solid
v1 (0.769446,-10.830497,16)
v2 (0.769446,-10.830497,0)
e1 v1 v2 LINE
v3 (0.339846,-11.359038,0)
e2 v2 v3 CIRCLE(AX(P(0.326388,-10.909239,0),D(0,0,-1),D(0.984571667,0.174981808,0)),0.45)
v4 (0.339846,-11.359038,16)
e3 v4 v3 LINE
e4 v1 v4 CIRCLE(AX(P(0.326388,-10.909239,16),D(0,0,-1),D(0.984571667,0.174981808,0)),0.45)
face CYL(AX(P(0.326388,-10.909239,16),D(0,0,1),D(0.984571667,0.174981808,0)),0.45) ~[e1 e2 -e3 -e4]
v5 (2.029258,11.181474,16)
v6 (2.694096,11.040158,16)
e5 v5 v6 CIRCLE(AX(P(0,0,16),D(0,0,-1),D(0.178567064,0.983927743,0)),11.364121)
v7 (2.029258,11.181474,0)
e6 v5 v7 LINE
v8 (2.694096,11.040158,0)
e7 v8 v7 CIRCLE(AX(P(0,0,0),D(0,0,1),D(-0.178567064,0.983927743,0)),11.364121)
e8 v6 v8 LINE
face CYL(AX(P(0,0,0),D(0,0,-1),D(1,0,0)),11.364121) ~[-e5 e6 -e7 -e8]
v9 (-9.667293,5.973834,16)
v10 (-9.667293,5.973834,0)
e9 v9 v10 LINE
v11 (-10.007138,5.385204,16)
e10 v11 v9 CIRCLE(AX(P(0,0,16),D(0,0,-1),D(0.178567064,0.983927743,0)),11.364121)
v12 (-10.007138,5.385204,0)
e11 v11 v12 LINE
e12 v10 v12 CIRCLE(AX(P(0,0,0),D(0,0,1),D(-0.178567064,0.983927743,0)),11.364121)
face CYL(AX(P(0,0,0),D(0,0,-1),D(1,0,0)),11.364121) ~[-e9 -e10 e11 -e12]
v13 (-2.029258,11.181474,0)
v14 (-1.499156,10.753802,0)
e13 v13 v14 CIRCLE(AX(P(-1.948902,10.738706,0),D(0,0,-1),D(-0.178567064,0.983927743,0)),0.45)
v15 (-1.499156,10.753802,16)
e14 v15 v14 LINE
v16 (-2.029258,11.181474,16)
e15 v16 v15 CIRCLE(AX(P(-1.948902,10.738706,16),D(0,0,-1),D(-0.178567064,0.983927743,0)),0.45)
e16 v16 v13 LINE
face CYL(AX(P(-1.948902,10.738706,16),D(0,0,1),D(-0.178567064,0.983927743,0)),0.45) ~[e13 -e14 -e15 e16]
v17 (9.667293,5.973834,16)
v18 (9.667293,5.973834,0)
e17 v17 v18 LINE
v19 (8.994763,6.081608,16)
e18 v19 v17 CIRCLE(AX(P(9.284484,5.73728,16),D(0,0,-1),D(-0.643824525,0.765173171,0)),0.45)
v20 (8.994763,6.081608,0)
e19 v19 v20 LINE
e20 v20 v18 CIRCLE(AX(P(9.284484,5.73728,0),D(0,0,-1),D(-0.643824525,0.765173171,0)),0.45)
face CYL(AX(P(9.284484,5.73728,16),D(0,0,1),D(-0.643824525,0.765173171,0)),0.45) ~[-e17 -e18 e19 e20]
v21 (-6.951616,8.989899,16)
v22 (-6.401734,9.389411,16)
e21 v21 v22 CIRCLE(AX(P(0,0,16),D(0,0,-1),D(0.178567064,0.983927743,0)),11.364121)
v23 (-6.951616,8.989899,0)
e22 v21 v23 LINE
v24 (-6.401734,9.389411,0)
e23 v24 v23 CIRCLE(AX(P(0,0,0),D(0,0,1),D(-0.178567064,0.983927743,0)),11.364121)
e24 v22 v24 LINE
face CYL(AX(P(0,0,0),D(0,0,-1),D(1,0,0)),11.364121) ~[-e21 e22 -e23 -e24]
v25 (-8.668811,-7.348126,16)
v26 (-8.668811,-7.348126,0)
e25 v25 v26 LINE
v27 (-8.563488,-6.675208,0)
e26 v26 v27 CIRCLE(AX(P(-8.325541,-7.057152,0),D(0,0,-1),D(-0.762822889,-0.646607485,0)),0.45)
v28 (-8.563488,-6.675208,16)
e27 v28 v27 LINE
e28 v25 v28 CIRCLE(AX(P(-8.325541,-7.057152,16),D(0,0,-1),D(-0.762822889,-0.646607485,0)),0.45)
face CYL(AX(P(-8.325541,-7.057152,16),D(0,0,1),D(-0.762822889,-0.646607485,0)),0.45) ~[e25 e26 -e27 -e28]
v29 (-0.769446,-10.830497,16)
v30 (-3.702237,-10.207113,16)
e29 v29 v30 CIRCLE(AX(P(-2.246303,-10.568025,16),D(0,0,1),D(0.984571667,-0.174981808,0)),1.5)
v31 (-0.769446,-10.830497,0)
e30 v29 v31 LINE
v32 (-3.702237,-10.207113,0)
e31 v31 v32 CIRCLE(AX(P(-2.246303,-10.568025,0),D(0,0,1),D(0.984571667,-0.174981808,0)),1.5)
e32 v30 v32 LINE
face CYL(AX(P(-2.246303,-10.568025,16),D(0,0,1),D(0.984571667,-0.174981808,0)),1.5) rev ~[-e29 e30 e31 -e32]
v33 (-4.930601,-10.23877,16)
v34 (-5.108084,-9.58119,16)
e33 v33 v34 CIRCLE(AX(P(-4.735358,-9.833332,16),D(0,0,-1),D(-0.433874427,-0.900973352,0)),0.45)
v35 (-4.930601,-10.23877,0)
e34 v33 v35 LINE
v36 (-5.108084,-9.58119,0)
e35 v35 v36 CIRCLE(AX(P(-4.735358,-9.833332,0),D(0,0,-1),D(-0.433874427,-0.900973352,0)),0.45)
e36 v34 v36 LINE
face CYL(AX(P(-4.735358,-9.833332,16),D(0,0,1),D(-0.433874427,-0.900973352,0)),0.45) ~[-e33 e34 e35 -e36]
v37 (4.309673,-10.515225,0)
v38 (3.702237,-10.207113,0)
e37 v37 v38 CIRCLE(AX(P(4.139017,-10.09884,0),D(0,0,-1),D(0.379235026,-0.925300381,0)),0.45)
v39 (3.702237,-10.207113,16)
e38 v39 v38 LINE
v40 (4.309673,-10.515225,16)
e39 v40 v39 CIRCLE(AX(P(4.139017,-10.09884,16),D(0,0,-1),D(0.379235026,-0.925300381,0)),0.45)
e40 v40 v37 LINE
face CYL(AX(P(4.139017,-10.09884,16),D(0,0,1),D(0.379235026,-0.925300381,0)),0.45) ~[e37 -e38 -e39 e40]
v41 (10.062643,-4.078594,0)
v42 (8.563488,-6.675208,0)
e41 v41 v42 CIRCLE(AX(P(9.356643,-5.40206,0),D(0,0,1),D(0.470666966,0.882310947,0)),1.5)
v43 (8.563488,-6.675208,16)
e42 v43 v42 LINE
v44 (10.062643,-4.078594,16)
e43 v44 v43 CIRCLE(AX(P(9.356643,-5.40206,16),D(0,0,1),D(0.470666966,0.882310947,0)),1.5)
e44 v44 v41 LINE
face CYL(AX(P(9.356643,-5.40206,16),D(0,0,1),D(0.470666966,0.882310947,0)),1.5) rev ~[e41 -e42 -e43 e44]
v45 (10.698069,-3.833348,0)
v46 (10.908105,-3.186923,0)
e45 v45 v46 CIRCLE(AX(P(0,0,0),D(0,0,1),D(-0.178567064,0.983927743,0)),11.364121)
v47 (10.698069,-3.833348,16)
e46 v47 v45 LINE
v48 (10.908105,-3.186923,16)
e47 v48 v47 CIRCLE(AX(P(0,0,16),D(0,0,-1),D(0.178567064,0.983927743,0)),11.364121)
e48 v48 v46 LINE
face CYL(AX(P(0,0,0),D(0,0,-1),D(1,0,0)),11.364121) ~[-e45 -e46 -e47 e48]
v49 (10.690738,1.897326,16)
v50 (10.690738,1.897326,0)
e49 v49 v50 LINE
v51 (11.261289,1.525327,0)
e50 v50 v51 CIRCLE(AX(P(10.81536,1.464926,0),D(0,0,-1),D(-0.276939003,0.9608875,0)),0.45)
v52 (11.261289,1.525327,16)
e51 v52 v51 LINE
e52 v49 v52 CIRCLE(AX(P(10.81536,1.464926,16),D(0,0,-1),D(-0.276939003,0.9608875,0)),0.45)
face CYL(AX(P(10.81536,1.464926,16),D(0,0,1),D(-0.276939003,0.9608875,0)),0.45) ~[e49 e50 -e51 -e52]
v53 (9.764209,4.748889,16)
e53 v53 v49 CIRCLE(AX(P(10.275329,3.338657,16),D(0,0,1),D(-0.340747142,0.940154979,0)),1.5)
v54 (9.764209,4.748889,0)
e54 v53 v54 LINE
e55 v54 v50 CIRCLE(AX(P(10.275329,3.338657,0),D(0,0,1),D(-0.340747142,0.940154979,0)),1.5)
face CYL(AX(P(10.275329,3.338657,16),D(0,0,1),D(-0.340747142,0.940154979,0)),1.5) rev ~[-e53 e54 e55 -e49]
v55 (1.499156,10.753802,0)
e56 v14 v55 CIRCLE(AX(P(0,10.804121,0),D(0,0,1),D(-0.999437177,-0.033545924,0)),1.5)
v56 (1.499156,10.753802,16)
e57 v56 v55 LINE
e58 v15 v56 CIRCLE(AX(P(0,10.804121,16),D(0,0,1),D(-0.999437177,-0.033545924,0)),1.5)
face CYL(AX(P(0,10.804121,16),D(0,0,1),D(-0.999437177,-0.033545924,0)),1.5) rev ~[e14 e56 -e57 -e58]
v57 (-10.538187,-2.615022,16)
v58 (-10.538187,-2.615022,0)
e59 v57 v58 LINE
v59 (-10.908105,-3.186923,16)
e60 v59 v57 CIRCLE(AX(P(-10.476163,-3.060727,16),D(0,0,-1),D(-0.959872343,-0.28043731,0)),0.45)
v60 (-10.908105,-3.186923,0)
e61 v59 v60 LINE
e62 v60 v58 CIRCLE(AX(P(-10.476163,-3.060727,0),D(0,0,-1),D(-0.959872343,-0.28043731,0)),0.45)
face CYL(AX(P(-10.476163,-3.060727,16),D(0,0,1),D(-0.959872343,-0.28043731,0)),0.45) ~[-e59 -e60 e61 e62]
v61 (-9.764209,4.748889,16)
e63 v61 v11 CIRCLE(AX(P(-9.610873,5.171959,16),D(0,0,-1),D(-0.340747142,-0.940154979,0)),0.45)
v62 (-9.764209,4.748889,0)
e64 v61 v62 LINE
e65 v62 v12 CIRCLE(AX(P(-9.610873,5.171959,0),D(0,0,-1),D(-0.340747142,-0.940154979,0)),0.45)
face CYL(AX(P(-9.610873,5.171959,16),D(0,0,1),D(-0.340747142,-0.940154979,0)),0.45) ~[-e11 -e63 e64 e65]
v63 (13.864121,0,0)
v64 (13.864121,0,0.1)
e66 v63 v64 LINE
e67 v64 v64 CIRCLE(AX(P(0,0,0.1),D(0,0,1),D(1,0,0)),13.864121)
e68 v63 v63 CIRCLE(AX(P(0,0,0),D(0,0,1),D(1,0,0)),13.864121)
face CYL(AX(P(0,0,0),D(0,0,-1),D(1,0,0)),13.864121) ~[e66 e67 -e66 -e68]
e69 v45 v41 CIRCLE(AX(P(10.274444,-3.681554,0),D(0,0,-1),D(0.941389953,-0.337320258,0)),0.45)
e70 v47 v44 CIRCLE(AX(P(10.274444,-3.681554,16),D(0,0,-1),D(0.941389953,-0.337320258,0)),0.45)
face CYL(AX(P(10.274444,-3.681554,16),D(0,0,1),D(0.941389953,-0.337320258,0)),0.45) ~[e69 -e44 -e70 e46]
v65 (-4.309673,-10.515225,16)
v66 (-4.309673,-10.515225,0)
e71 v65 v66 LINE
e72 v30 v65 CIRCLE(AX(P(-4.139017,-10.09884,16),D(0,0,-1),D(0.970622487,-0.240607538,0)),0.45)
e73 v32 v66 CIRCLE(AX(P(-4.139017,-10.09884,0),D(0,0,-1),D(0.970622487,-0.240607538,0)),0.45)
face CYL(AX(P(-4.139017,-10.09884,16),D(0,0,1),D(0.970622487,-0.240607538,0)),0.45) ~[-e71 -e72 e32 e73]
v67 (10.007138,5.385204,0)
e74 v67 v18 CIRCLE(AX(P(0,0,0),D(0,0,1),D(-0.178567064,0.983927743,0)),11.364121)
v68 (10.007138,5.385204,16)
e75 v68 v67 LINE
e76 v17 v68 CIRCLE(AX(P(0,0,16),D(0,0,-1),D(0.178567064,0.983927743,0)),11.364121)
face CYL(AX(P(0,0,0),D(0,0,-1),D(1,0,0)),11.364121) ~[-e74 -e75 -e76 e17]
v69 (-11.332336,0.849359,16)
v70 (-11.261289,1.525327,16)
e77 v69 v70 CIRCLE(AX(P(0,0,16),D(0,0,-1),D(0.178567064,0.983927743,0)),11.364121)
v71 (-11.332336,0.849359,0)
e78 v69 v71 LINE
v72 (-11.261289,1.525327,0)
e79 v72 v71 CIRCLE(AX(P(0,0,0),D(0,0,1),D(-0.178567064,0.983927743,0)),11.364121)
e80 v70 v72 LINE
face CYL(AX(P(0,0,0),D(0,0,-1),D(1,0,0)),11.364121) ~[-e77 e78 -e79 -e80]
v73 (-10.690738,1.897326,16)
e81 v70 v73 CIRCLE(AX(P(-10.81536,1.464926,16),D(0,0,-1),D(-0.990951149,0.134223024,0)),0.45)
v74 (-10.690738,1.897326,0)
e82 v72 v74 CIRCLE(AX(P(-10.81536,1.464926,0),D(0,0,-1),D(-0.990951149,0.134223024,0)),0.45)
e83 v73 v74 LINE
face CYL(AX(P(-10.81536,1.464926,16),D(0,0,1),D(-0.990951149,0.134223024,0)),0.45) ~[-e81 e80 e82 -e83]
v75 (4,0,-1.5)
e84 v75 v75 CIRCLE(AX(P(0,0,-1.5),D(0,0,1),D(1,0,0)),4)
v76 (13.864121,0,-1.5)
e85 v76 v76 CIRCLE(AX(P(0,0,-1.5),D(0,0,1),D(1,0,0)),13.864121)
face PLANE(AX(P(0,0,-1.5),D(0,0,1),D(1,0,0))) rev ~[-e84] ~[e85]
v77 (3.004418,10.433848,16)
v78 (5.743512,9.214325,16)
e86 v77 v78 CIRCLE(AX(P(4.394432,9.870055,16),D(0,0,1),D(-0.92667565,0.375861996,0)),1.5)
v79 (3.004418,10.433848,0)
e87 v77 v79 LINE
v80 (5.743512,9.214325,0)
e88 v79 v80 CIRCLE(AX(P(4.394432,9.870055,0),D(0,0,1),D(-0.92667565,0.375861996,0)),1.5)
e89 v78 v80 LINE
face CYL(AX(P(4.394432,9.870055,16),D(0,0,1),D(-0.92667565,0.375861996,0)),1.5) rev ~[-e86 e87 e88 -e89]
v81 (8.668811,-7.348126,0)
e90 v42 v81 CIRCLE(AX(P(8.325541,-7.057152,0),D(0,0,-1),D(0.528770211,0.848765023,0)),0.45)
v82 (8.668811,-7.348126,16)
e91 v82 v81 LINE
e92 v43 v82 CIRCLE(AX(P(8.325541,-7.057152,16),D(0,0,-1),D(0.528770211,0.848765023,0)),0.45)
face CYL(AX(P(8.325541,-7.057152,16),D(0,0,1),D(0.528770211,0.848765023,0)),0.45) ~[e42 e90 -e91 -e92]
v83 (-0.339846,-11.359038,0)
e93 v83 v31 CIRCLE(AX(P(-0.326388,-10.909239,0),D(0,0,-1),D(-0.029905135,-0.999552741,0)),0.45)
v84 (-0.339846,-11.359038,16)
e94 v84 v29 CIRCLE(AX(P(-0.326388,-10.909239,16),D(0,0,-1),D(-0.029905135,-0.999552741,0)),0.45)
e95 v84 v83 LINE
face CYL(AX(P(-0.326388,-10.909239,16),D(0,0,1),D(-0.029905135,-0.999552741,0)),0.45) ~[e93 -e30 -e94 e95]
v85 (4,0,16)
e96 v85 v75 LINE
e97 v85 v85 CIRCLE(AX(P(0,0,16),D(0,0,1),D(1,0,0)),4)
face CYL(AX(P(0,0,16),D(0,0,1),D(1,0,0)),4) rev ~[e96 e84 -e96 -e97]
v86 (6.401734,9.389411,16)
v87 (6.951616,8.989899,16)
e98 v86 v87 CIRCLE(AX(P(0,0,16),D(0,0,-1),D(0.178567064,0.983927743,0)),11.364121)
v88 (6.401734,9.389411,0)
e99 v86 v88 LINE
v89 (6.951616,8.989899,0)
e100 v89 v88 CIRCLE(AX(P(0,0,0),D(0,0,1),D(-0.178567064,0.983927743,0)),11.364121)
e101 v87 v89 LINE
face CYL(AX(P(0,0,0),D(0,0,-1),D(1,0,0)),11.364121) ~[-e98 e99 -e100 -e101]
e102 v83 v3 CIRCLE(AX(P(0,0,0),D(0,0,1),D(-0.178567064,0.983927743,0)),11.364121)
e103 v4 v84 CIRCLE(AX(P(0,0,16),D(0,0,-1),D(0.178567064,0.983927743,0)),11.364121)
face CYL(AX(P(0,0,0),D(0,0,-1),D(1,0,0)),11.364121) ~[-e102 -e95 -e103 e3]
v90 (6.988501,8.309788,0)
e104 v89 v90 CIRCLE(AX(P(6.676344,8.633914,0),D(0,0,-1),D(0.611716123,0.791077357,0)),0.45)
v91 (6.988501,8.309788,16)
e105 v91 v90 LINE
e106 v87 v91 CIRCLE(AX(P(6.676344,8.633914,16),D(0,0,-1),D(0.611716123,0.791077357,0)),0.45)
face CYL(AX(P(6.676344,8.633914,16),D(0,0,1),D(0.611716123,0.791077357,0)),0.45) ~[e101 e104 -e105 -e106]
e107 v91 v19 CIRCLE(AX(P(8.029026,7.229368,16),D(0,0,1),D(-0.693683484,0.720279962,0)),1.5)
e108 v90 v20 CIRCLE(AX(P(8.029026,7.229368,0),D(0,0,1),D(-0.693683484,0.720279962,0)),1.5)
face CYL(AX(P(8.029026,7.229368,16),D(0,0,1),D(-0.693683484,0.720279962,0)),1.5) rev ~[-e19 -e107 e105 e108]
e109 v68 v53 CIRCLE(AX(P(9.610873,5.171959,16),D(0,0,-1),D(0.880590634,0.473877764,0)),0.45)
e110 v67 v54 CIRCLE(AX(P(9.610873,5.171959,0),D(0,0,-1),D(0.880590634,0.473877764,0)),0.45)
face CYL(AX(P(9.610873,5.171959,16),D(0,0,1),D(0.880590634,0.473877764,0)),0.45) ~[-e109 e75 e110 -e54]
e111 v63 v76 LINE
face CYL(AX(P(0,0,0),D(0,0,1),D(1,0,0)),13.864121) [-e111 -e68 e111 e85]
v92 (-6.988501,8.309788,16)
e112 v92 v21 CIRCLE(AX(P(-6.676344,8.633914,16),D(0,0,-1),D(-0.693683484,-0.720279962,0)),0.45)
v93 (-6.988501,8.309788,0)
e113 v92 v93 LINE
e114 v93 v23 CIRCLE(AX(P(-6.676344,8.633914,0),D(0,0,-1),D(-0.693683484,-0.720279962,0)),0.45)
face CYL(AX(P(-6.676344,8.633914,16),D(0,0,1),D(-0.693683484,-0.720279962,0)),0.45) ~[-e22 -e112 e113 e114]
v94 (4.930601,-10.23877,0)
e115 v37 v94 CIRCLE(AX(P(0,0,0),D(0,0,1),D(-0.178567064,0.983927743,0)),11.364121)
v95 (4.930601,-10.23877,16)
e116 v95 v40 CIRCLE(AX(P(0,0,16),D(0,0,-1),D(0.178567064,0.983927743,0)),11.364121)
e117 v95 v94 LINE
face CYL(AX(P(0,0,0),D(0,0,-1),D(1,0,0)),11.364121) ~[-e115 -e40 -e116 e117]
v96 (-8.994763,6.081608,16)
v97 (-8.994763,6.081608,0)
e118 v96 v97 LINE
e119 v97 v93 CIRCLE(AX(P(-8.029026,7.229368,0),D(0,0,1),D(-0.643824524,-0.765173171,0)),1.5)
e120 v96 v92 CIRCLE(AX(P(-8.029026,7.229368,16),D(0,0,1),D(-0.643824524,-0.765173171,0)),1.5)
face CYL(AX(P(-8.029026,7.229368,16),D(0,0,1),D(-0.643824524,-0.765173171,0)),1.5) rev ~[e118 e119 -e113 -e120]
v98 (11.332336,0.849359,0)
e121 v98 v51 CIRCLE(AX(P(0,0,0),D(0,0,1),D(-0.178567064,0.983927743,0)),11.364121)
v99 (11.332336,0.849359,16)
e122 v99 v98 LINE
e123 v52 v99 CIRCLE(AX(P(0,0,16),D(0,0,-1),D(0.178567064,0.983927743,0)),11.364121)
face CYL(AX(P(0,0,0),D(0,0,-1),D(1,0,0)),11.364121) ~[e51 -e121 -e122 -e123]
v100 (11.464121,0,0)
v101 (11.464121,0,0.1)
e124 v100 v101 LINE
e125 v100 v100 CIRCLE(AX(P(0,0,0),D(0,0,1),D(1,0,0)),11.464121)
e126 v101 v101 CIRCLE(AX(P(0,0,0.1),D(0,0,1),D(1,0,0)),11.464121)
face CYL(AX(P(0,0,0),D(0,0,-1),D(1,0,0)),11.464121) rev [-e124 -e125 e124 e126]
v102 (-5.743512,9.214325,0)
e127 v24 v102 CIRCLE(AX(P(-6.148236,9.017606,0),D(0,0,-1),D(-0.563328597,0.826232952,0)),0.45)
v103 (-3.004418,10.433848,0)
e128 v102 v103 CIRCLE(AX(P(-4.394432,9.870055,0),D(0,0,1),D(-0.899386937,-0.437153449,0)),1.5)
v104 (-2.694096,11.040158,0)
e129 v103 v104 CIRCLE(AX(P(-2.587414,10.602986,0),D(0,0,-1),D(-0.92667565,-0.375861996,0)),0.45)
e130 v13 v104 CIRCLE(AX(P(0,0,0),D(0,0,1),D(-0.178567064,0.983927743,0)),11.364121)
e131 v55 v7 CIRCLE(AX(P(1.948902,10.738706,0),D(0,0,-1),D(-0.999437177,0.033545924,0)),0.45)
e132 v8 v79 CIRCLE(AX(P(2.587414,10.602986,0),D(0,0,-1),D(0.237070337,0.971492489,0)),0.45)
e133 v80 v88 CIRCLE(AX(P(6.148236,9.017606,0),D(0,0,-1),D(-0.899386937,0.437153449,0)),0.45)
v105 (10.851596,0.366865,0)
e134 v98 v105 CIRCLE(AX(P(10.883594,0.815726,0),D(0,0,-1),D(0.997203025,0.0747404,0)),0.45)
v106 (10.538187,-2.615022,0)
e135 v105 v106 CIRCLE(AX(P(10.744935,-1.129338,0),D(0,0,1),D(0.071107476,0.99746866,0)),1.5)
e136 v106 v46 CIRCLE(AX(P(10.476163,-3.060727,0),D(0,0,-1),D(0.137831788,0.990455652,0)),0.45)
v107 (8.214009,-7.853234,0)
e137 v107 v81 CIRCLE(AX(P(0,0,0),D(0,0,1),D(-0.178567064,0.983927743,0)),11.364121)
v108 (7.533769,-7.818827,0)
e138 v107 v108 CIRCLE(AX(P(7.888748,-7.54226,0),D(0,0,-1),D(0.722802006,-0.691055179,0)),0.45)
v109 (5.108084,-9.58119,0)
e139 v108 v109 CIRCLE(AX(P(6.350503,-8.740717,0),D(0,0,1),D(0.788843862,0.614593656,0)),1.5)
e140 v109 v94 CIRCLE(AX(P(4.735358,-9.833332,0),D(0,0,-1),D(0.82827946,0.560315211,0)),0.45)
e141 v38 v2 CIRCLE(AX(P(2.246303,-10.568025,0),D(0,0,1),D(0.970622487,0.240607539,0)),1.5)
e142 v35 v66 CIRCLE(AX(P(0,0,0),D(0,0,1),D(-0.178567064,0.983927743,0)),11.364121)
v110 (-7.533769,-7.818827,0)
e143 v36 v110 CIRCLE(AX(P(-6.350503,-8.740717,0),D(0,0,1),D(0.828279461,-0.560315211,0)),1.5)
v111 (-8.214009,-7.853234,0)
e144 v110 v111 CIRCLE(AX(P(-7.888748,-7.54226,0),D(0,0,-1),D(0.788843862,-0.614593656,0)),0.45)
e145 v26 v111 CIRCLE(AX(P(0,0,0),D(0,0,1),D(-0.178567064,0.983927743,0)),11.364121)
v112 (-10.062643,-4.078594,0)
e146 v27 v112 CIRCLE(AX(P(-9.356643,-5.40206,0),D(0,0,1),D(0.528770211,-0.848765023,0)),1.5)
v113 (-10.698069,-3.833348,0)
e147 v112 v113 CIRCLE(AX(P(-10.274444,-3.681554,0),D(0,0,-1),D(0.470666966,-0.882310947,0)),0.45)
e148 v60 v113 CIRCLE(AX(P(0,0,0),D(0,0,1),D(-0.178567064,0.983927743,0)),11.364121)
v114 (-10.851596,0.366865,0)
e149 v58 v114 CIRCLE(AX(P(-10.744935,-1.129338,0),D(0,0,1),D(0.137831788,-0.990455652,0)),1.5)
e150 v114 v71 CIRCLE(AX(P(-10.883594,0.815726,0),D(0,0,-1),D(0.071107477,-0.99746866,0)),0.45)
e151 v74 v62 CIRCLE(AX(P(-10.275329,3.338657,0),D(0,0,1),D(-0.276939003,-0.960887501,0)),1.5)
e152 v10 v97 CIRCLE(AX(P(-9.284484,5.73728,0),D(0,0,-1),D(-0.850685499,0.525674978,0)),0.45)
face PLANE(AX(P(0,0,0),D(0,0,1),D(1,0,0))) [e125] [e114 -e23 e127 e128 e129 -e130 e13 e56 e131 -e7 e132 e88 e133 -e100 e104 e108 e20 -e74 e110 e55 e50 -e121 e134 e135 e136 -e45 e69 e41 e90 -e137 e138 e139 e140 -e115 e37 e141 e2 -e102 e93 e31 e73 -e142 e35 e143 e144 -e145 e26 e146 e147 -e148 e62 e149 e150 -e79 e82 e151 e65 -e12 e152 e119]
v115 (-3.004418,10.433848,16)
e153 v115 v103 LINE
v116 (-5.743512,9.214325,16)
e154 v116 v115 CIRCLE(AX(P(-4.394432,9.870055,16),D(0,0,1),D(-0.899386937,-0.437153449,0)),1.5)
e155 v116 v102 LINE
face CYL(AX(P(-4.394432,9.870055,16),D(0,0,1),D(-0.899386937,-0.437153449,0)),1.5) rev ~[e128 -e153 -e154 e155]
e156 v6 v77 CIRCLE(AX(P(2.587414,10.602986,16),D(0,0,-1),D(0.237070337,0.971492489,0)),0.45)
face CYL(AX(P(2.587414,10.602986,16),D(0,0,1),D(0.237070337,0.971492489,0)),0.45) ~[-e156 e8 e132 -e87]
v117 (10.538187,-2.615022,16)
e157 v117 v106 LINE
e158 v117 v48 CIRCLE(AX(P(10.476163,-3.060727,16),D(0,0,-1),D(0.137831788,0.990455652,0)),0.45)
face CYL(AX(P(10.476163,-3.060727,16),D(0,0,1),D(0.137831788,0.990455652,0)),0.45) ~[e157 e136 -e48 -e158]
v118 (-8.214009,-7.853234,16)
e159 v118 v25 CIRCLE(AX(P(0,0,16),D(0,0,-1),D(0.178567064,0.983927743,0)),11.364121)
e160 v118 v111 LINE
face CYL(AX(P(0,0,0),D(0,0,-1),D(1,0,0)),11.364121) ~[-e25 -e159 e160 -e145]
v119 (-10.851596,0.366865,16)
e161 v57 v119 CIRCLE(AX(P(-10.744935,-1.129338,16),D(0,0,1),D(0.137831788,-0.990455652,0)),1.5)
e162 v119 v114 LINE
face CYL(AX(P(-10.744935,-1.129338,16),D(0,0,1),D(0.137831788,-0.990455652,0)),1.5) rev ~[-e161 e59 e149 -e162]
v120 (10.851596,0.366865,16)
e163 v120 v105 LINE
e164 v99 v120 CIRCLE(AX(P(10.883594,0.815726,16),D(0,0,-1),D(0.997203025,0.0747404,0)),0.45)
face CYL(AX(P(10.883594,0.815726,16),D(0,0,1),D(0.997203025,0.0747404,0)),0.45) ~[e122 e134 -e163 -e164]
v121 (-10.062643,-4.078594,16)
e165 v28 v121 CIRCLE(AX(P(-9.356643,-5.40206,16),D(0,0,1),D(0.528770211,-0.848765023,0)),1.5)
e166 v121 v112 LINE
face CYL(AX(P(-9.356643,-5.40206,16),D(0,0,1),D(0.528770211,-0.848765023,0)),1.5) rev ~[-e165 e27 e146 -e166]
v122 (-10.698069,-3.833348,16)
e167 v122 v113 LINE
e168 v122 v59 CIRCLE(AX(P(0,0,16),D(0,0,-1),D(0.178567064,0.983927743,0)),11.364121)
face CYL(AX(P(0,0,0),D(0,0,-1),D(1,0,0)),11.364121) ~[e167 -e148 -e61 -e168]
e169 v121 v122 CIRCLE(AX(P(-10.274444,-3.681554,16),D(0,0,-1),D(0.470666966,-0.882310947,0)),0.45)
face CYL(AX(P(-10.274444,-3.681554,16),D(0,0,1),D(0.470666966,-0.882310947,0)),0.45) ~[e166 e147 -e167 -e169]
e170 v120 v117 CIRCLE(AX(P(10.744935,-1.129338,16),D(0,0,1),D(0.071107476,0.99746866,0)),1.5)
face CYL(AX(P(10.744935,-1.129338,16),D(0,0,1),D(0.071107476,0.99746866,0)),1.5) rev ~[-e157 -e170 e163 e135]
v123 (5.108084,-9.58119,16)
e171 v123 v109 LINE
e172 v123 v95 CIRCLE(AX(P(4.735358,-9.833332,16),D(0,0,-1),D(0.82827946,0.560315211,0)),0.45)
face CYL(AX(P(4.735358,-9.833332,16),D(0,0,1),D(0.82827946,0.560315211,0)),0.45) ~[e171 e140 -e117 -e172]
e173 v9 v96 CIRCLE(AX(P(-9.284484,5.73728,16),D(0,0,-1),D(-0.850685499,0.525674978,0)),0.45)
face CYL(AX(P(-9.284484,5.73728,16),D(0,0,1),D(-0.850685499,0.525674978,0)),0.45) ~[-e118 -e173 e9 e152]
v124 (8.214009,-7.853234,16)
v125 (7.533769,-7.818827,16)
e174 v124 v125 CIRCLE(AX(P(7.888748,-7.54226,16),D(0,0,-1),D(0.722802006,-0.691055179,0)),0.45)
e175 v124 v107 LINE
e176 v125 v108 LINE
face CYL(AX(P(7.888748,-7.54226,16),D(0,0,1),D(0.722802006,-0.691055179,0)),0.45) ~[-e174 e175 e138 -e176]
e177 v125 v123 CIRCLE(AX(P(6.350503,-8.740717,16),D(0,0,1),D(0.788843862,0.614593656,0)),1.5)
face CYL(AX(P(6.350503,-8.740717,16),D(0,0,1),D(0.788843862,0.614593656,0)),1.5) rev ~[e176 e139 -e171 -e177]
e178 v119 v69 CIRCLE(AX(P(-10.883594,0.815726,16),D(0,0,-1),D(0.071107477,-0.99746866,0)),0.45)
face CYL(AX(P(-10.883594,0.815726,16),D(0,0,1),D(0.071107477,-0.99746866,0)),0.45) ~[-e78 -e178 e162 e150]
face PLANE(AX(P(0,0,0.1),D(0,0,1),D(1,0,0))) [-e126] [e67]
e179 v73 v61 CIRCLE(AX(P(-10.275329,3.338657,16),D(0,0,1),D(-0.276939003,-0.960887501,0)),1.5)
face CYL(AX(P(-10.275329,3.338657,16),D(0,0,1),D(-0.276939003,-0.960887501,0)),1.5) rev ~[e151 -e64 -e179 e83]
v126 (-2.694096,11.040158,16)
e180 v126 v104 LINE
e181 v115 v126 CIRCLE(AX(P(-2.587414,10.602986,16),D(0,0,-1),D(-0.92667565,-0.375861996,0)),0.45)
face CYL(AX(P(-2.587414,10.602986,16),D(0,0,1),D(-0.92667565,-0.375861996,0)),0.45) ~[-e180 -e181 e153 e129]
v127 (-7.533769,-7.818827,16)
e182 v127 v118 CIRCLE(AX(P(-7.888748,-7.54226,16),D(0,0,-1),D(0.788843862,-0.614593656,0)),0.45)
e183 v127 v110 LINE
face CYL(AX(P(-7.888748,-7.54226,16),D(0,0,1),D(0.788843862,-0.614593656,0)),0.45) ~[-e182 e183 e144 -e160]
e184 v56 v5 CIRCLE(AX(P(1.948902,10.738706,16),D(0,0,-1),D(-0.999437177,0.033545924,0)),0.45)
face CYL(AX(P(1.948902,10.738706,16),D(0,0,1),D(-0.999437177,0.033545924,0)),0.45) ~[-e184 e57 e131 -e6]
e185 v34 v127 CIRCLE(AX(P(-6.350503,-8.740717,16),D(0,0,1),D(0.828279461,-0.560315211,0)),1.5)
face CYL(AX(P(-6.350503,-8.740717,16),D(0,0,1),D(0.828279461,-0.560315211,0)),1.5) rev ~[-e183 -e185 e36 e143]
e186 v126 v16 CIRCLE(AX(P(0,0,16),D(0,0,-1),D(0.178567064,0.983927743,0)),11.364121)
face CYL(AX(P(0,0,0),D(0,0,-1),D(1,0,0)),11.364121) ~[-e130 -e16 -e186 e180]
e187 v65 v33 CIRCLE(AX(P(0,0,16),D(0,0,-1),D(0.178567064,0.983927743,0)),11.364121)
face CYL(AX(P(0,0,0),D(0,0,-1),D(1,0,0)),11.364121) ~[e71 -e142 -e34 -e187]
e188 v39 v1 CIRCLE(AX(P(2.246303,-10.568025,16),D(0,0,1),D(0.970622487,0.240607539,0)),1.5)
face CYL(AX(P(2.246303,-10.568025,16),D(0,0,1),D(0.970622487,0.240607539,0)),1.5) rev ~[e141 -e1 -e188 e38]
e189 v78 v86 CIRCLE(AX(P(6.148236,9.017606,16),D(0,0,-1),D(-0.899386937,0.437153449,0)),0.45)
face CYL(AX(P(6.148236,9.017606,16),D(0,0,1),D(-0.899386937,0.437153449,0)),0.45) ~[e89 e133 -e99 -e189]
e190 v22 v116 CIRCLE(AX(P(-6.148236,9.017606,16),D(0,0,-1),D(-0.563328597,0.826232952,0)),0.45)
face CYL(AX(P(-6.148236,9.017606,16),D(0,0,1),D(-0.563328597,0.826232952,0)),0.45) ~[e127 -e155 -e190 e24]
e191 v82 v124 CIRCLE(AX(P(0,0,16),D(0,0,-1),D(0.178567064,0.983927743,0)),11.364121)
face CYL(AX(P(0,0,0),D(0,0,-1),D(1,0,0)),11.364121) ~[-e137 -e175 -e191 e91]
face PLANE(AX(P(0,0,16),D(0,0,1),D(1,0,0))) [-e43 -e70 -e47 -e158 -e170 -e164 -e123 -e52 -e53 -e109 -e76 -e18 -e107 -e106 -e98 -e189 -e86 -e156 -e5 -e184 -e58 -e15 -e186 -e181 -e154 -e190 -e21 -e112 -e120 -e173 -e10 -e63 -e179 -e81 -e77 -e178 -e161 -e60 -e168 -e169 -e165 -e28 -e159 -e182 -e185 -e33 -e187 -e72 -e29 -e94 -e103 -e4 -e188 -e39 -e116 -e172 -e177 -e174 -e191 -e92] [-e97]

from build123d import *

# Parameters (mm, degrees)
F2_R            = 11.3641207455
F3_DEPTH        = 16
F5_DEPTH        = 16
F5_COPIES_COUNT = 15
F8_R            = 13.8641207455
F8_R_2          = 11.3641207455
F9_DEPTH        = 1.5
F7_R            = 4
F10_DEPTH       = 17.501
F11_R           = 13.8641207455
F11_R_2         = 11.4641207455
F12_DEPTH       = 0.1


# Not quite as in the source:
# - a feature of the source that left no trace in its solid (it failed there, or was rolled back) is left out
# - a pattern or mirror of a feature is missing from the dataset's text; its kind, count and spacing are read off the source's solid


with BuildPart() as f3:
    # F2 (on Top) → F3 (new body)
    with BuildSketch(Plane.XY):
        Circle(F2_R)
    extrude(amount=F3_DEPTH)

    # F4 (on face) → F5 (cut, through all)
    with BuildSketch(Plane.XY.offset(16)):
        with BuildLine():
            ThreePointArc((-2.0292576741, 11.181473678), (-1.6663457301, 11.0889370809), (-1.4991557657, 10.7538018594))
            ThreePointArc((-1.4991557657, 10.7538018594), (0, 9.3041207455), (1.4991557657, 10.7538018594))
            ThreePointArc((1.4991557657, 10.7538018594), (1.6663457301, 11.0889370809), (2.0292576741, 11.181473678))
            ThreePointArc((2.0292576741, 11.181473678), (0, 11.3641207455), (-2.0292576741, 11.181473678))
        make_face()
    f5 = extrude(amount=-F5_DEPTH, mode=Mode.SUBTRACT)

    # F5_copies: F5 ×15 about axis
    f5_copies_axis = Axis((0, 0, 0), (0, 0, 1))
    for i in range(1, F5_COPIES_COUNT):
        add(f5.rotate(f5_copies_axis, i * 360 / F5_COPIES_COUNT), mode=Mode.SUBTRACT)

    # F8 (on face) + F2 (on Top) → F9 (join)
    with BuildSketch(Plane.XY):
        Circle(F8_R)
        Circle(F8_R_2, mode=Mode.SUBTRACT)
    with BuildSketch(Plane.XY):
        Circle(F2_R)
    extrude(amount=-F9_DEPTH)

    # F7 (on face) → F10 (cut, through all)
    with BuildSketch(Plane.XY.offset(16)):
        Circle(F7_R)
    extrude(amount=-F10_DEPTH, mode=Mode.SUBTRACT)

    # F11 (on face) → F12 (join)
    with BuildSketch(Plane.XY):
        Circle(F11_R)
        Circle(F11_R_2, mode=Mode.SUBTRACT)
    extrude(amount=F12_DEPTH)


solid = f3.part
